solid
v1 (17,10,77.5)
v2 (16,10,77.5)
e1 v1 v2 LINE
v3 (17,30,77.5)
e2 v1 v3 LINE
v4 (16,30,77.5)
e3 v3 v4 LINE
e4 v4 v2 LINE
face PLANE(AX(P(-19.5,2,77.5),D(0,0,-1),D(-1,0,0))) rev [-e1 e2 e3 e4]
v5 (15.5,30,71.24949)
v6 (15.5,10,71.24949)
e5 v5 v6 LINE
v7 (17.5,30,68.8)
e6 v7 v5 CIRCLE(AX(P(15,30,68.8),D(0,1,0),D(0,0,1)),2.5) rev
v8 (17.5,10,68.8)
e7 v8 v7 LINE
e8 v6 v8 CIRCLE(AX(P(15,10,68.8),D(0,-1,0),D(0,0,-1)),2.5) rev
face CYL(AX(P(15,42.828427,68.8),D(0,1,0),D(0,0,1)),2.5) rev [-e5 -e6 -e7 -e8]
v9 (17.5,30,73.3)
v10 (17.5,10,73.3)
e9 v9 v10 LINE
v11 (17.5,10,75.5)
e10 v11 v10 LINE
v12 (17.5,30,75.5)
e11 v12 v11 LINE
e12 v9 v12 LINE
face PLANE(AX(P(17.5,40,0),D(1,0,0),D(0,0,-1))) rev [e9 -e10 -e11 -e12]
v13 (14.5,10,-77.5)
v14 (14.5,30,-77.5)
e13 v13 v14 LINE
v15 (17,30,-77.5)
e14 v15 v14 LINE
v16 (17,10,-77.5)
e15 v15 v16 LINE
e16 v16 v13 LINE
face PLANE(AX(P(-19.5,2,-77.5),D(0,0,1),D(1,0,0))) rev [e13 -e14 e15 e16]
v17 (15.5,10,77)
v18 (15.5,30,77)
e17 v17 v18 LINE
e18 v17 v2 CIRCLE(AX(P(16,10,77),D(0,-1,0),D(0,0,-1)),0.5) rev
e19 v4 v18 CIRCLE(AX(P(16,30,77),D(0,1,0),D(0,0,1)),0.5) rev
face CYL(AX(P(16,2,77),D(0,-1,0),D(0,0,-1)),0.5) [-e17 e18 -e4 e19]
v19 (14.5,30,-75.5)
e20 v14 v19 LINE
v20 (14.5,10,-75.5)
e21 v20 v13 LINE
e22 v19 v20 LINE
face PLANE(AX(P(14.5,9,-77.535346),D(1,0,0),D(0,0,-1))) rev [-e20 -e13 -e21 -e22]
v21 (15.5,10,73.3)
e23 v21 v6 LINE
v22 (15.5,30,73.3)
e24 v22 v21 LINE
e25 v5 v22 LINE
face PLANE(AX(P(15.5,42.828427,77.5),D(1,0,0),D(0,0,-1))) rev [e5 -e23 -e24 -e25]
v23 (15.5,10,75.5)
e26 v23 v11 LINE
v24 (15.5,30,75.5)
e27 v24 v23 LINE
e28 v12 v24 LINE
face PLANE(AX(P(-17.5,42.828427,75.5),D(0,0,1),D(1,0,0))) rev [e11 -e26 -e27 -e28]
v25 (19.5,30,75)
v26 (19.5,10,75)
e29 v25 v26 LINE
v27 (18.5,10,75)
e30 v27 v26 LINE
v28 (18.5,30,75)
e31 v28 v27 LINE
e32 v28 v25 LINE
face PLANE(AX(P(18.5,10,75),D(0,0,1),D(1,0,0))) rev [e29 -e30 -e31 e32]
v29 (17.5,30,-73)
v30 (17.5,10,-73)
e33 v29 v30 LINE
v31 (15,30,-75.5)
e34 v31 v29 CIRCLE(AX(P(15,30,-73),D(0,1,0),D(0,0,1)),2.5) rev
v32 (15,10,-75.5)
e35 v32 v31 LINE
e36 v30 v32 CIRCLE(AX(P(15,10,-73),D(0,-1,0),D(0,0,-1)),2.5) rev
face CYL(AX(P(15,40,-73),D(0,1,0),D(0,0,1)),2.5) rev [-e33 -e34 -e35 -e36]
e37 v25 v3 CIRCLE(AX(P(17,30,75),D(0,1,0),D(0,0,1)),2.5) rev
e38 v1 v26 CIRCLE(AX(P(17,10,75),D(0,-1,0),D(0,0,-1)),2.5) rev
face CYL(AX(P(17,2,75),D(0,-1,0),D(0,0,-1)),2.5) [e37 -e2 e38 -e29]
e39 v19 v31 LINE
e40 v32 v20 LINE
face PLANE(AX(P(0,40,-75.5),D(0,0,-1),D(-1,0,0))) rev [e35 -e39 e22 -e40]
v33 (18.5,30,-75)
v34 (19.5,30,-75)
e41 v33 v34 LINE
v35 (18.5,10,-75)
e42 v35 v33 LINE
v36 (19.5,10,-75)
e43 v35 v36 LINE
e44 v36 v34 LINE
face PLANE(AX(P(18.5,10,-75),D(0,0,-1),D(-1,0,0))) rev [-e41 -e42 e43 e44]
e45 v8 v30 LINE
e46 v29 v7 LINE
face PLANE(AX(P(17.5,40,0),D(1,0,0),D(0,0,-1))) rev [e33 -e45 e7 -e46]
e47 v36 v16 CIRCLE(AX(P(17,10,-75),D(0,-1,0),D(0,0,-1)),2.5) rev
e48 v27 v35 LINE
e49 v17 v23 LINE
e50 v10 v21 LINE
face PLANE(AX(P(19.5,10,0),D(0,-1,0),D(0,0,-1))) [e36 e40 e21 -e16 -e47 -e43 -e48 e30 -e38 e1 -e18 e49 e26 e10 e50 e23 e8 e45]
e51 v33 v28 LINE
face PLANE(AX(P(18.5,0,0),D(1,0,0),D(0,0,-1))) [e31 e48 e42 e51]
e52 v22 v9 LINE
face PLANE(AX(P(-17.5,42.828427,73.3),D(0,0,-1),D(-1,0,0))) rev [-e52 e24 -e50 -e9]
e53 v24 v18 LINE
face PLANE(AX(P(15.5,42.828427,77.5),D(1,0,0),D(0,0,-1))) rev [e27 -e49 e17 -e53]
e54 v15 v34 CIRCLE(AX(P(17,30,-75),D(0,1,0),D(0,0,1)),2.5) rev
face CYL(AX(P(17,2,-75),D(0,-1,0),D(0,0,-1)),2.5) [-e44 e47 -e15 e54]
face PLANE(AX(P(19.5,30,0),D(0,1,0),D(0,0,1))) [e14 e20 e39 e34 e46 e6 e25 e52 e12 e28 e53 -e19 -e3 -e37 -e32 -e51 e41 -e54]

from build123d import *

# Parameters (mm, degrees)
SKETCH1_W                       = 39
SKETCH1_H                       = 155
BOSS_EXTRUDE1_DEPTH             = 2
BOSS_EXTRUDE2_DEPTH             = 38
SKETCH3_W                       = 2
SKETCH3_H                       = 2
BOSS_EXTRUDE3_DEPTH             = 38
SKETCH4_W                       = 2
SKETCH4_H                       = 2
BOSS_EXTRUDE4_DEPTH             = 151
SKETCH6_W                       = 35
SKETCH6_H                       = 2.2
CUT_EXTRUDE1_DEPTH              = 160.340045186
SKETCH7_W                       = 35
SKETCH7_H                       = 2.2
CUT_EXTRUDE2_DEPTH              = 89.490112442
SKETCH5_W                       = 31
SKETCH5_H                       = 2
BOSS_EXTRUDE5_DEPTH             = 2
BOSS_EXTRUDE6_REACH             = 91.367
SKETCH8_W                       = 2
SKETCH8_H                       = 2
BOSS_EXTRUDE6_DIRECTION_2_REACH = 91.367
SKETCH10_W                      = 2
SKETCH10_H                      = 2.2
SKETCH10_W_2                    = 2.2
SKETCH10_H_2                    = 2
BOSS_EXTRUDE8_DEPTH             = 2
SKETCH11_W                      = 2
SKETCH11_H                      = 2.2
SKETCH11_W_2                    = 2.2
SKETCH11_H_2                    = 2
BOSS_EXTRUDE9_DEPTH             = 2
FILLET2_R                       = 2.5
SKETCH14_W                      = 36.5
SKETCH14_H                      = 7.75
BOSS_EXTRUDE10_DEPTH            = 2
SKETCH13_W                      = 31
SKETCH13_H                      = 3
CUT_EXTRUDE4_DEPTH              = 2
FILLET3_R                       = 2
FILLET4_R                       = 0.5
SKETCH15_R                      = 5.1
CUT_EXTRUDE5_DEPTH              = 90.367219941
SKETCH16_R                      = 7.1
BOSS_EXTRUDE11_DEPTH            = 1
FILLET5_R                       = 0.5
CUT_EXTRUDE3_DEPTH              = 160.340045186
FILLET6_R                       = 0.4
FILLET7_R                       = 0.5
CUT_EXTRUDE6_DEPTH              = 6
SKETCH18_W                      = 29
SKETCH18_H                      = 3
CUT_EXTRUDE8_DEPTH              = 90.367220028
CUT_EXTRUDE11_DEPTH             = 90.367220028
CUT_EXTRUDE11_DEPTH_BACK        = 90.367220028
SKETCH20_W                      = 29
SKETCH20_H                      = 34
SKETCH21_W                      = 155
SKETCH21_H                      = 10
CUT_EXTRUDE12_DEPTH             = 90.367219941
SKETCH22_W                      = 150
SKETCH22_H                      = 20
CUT_EXTRUDE13_DEPTH             = 1


with BuildPart() as part:
    # Sketch1 → Boss-Extrude1 (new body)
    with BuildSketch(Plane(origin=(0, 0, 0), x_dir=(1, 0, 0), z_dir=(0, 1, 0))):
        Rectangle(SKETCH1_W, SKETCH1_H)
    extrude(amount=BOSS_EXTRUDE1_DEPTH)

    # Sketch2 → Boss-Extrude2 (add)
    with BuildSketch(Plane(origin=(0, 2, 0), x_dir=(1, 0, 0), z_dir=(0, 1, 0))):
        Polygon((-17.5, -77.5), (-17.5, -75.5), (-17.5, 75.5), (17.5, 75.5), (17.5, -75.5), (17.5, -77.5), (19.5, -77.5), (19.5, 77.5), (-19.5, 77.5), (-19.5, -77.5), align=None)
    extrude(amount=BOSS_EXTRUDE2_DEPTH)

    # Sketch3 → Boss-Extrude3 (add)
    with BuildSketch(Plane(origin=(0, 2, 0), x_dir=(1, 0, 0), z_dir=(0, 1, 0))):
        with Locations((-16.5, -76.5)):
            Rectangle(SKETCH3_W, SKETCH3_H)
        with Locations((-16.5, -72.3)):
            Rectangle(SKETCH3_W, SKETCH3_H)
        with Locations((16.5, -76.5)):
            Rectangle(SKETCH3_W, SKETCH3_H)
        with Locations((16.5, -72.3)):
            Rectangle(SKETCH3_W, SKETCH3_H)
    extrude(amount=BOSS_EXTRUDE3_DEPTH)

    # Sketch4 → Boss-Extrude4 (add)
    with BuildSketch(Plane.XY.offset(-75.5)):
        with Locations((-16.5, 39)):
            Rectangle(SKETCH4_W, SKETCH4_H)
        Polygon((-15.5, 33.8), (-17.5, 31.8), (-17.5, 35.8), (-15.5, 35.8), align=None)
        Polygon((15.5, 35.8), (17.5, 35.8), (17.5, 31.8), (15.5, 33.8), align=None)
        with Locations((16.5, 39)):
            Rectangle(SKETCH4_W, SKETCH4_H)
    extrude(amount=BOSS_EXTRUDE4_DEPTH)

    # Sketch6 → Cut-Extrude1 (cut, through all)
    with BuildSketch(Plane.XY.offset(-75.5)):
        with Locations((0, 36.9)):
            Rectangle(SKETCH6_W, SKETCH6_H)
    extrude(amount=CUT_EXTRUDE1_DEPTH, mode=Mode.SUBTRACT)

    # Sketch7 → Cut-Extrude2 (cut, through all)
    with BuildSketch(Plane(origin=(0, 2, 0), x_dir=(1, 0, 0), z_dir=(0, 1, 0))):
        with Locations((0, -74.4)):
            Rectangle(SKETCH7_W, SKETCH7_H)
    extrude(amount=CUT_EXTRUDE2_DEPTH, mode=Mode.SUBTRACT)

    # Sketch5 → Boss-Extrude5 (add)
    with BuildSketch(Plane(origin=(0, 2, 0), x_dir=(1, 0, 0), z_dir=(0, 1, 0))):
        with Locations((0, -76.5)):
            Rectangle(SKETCH5_W, SKETCH5_H)
        with Locations((0, -72.3)):
            Rectangle(SKETCH5_W, SKETCH5_H)
    extrude(amount=BOSS_EXTRUDE5_DEPTH)

    # Boss-Extrude6: up to this face of the body (flat: up to its plane)
    boss_extrude6_end = Plane(part.part.faces().sort_by_distance((17.5, 16.9, -2.1))[0])
    # Sketch8 → Boss-Extrude6 (add, up to the picked face)
    with BuildSketch(Plane(origin=(0, 0, 0), x_dir=(0, 0, -1), z_dir=(1, 0, 0)), mode=Mode.PRIVATE) as boss_extrude6_sk1:
        with Locations((74.5, 39)):
            Rectangle(SKETCH8_W, SKETCH8_H)
    boss_extrude6_tool1 = split(extrude(boss_extrude6_sk1.sketch, amount=BOSS_EXTRUDE6_REACH, mode=Mode.PRIVATE), bisect_by=boss_extrude6_end, keep=Keep.BOTH, mode=Mode.PRIVATE)
    # Sketch8 → Boss-Extrude6 (add, up to the picked face)
    with BuildSketch(Plane(origin=(0, 0, 0), x_dir=(0, 0, -1), z_dir=(1, 0, 0)), mode=Mode.PRIVATE) as boss_extrude6_sk2:
        Polygon((75.5, 35.8), (73.5, 35.8), (73.5, 33.8), (75.5, 31.8), align=None)
    boss_extrude6_tool2 = split(extrude(boss_extrude6_sk2.sketch, amount=BOSS_EXTRUDE6_REACH, mode=Mode.PRIVATE), bisect_by=boss_extrude6_end, keep=Keep.BOTH, mode=Mode.PRIVATE)
    add(boss_extrude6_tool1.solids().sort_by(Axis((0, 39, -74.5), (1, 0, 0)))[0])
    add(boss_extrude6_tool2.solids().sort_by(Axis((0, 34.244444, -74.611111), (1, 0, 0)))[0])

    # Boss-Extrude6 direction 2: up to this face of the body (flat: up to its plane)
    boss_extrude6_direction_2_end = Plane(part.part.faces().sort_by_distance((-17.5, 16.9, -2.1))[0])
    # Sketch8 → Boss-Extrude6 direction 2 (add, up to the picked face)
    with BuildSketch(Plane(origin=(0, 0, 0), x_dir=(0, 0, -1), z_dir=(1, 0, 0)), mode=Mode.PRIVATE) as boss_extrude6_direction_2_sk1:
        with Locations((74.5, 39)):
            Rectangle(SKETCH8_W, SKETCH8_H)
    boss_extrude6_direction_2_tool1 = split(extrude(boss_extrude6_direction_2_sk1.sketch, amount=-BOSS_EXTRUDE6_DIRECTION_2_REACH, mode=Mode.PRIVATE), bisect_by=boss_extrude6_direction_2_end, keep=Keep.BOTH, mode=Mode.PRIVATE)
    # Sketch8 → Boss-Extrude6 direction 2 (add, up to the picked face)
    with BuildSketch(Plane(origin=(0, 0, 0), x_dir=(0, 0, -1), z_dir=(1, 0, 0)), mode=Mode.PRIVATE) as boss_extrude6_direction_2_sk2:
        Polygon((75.5, 35.8), (73.5, 35.8), (73.5, 33.8), (75.5, 31.8), align=None)
    boss_extrude6_direction_2_tool2 = split(extrude(boss_extrude6_direction_2_sk2.sketch, amount=-BOSS_EXTRUDE6_DIRECTION_2_REACH, mode=Mode.PRIVATE), bisect_by=boss_extrude6_direction_2_end, keep=Keep.BOTH, mode=Mode.PRIVATE)
    add(boss_extrude6_direction_2_tool1.solids().sort_by(Axis((0, 39, -74.5), (-1, 0, 0)))[0])
    add(boss_extrude6_direction_2_tool2.solids().sort_by(Axis((0, 34.244444, -74.611111), (-1, 0, 0)))[0])

    # Sketch10 → Boss-Extrude8 (add)
    with BuildSketch(Plane(origin=(-17.5, 0, 0), x_dir=(0, 0, -1), z_dir=(1, 0, 0))):
        with Locations((-76.5, 36.9)):
            Rectangle(SKETCH10_W, SKETCH10_H)
        with Locations((-74.4, 39)):
            Rectangle(SKETCH10_W_2, SKETCH10_H_2)
    extrude(amount=BOSS_EXTRUDE8_DEPTH)

    # Sketch11 → Boss-Extrude9 (add)
    with BuildSketch(Plane.ZY.offset(-17.5)):
        with Locations((76.5, 36.9)):
            Rectangle(SKETCH11_W, SKETCH11_H)
        with Locations((74.4, 39)):
            Rectangle(SKETCH11_W_2, SKETCH11_H_2)
    extrude(amount=BOSS_EXTRUDE9_DEPTH)

    # Fillet2
    fillet2_edges = [part.edges().sort_by_distance(p)[0] for p in [
        (-17.5, 16.9, 71.3),
        (17.5, 16.9, 71.3),
        (19.5, 20, 77.5),
        (-19.5, 20, 77.5),
        (-19.5, 20, -77.5),
        (-17.5, 16.9, -75.5),
        (17.5, 16.9, -75.5),
        (19.5, 20, -77.5),
        (19.5, 40, 0),
        (-19.5, 40, 0),
        (19.5, 0, 0),
        (-19.5, 0, 0),
        (0, 40, -77.5),
        (0, 0, 77.5),
        (0, 0, -77.5),
        (-17.5, 40, 77.5),
        (17.5, 40, 77.5),
    ]]
    fillet(fillet2_edges, radius=FILLET2_R)

    # Sketch14 → Boss-Extrude10 (add)
    with BuildSketch(Plane.XY.offset(-75.5)):
        with Locations((0, 5.125)):
            Rectangle(SKETCH14_W, SKETCH14_H)
    extrude(amount=BOSS_EXTRUDE10_DEPTH)

    # Sketch13 → Cut-Extrude4 (cut)
    with BuildSketch(Plane(origin=(0, 0, -77.5), x_dir=(-1, 0, 0), z_dir=(0, 0, -1))):
        with Locations((0, 5.5)):
            Rectangle(SKETCH13_W, SKETCH13_H)
    extrude(amount=-CUT_EXTRUDE4_DEPTH, mode=Mode.SUBTRACT)

    # Fillet3
    fillet3_edges = [part.edges().sort_by_distance(p)[0] for p in [
        (0, 9, -73.5),
    ]]
    fillet(fillet3_edges, radius=FILLET3_R - 0.0001)  # a hair under: the kernel refuses the full size

    # Fillet4
    fillet4_edges = [part.edges().sort_by_distance(p)[0] for p in [
        (15.5, 5.5, -75.5),
        (15.5, 4, -76.5),
        (0, 7, -75.5),
        (15.5, 7, -76.5),
        (-15.5, 5.5, -75.5),
        (-15.5, 7, -76.5),
        (0, 4, -75.5),
        (-15.5, 4, -76.5),
        (15.5, 5.5, -77.5),
        (0, 4, -77.5),
        (-15.5, 5.5, -77.5),
        (0, 7, -77.5),
    ]]
    fillet(fillet4_edges, radius=FILLET4_R)

    # Sketch15 → Cut-Extrude5 (cut, through all)
    with BuildSketch(Plane.XZ):
        with Locations(Location((0, 38.75, 0), (0, 0, 270))):
            Circle(SKETCH15_R)
        with Locations(Location((0, -38.75, 0), (0, 0, 270))):
            Circle(SKETCH15_R)
    extrude(amount=-CUT_EXTRUDE5_DEPTH, mode=Mode.SUBTRACT)

    # Sketch16 → Boss-Extrude11 (add)
    with BuildSketch(Plane(origin=(0, 2, 0), x_dir=(1, 0, 0), z_dir=(0, 1, 0))):
        with Locations(Location((0, 38.75, 0), (0, 0, 270))):
            Circle(SKETCH16_R)
        with Locations(Location((0, -38.75, 0), (0, 0, 270))):
            Circle(SKETCH16_R)
    extrude(amount=BOSS_EXTRUDE11_DEPTH)

    # Fillet5
    fillet5_edges = [part.edges().sort_by_distance(p)[0] for p in [
        (0, 2, -45.85),
        (0, 3, -45.85),
        (0, 2, 31.65),
        (0, 3, 31.65),
    ]]
    fillet(fillet5_edges, radius=FILLET5_R - 0.0001)  # a hair under: the kernel refuses the full size

    # Sketch12 → Cut-Extrude3 (cut, through all)
    with BuildSketch(Plane.XY.offset(-75.5)):
        with BuildLine():
            Line((1.668907005, 12.688040659), (2.22520934, 10.250720878))
            ThreePointArc((2.22520934, 10.250720878), (4.338837391, 10.990311321), (6.234898019, 12.181685175))
            Line((6.234898019, 12.181685175), (4.676173514, 14.136263881))
            ThreePointArc((4.676173514, 14.136263881), (3.254128043, 13.242733491), (1.668907005, 12.688040659))
        make_face()
        with BuildLine():
            ThreePointArc((-6.234898019, 12.181685175), (-4.338837391, 10.990311321), (-2.22520934, 10.250720878))
            Line((-2.22520934, 10.250720878), (-1.668907005, 12.688040659))
            ThreePointArc((-1.668907005, 12.688040659), (-3.254128043, 13.242733491), (-4.676173514, 14.136263881))
            Line((-4.676173514, 14.136263881), (-6.234898019, 12.181685175))
        make_face()
        with BuildLine():
            ThreePointArc((-10, 20), (-9.749279122, 17.77479066), (-9.009688679, 15.661162609))
            Line((-9.009688679, 15.661162609), (-6.757266509, 16.745871957))
            ThreePointArc((-6.757266509, 16.745871957), (-7.311959341, 18.331092995), (-7.5, 20))
            Line((-7.5, 20), (-10, 20))
        make_face()
        with BuildLine():
            ThreePointArc((-6.234898019, 27.818314825), (-7.818314825, 26.234898019), (-9.009688679, 24.338837391))
            Line((-9.009688679, 24.338837391), (-6.757266509, 23.254128043))
            ThreePointArc((-6.757266509, 23.254128043), (-5.863736119, 24.676173514), (-4.676173514, 25.863736119))
            Line((-4.676173514, 25.863736119), (-6.234898019, 27.818314825))
        make_face()
        with BuildLine():
            ThreePointArc((-1.668907005, 27.311959341), (-0.839733571, 27.452841574), (0, 27.5))
            Line((0, 27.5), (0, 30))
            ThreePointArc((0, 30), (-1.119644761, 29.937122099), (-2.22520934, 29.749279122))
            Line((-2.22520934, 29.749279122), (-1.668907005, 27.311959341))
        make_face()
        with BuildLine():
            Line((0, 30), (0, 27.5))
            ThreePointArc((0, 27.5), (0.839733571, 27.452841574), (1.668907005, 27.311959341))
            Line((1.668907005, 27.311959341), (2.22520934, 29.749279122))
            ThreePointArc((2.22520934, 29.749279122), (1.119644761, 29.937122099), (0, 30))
        make_face()
        with BuildLine():
            Line((6.757266509, 23.254128043), (9.009688679, 24.338837391))
            ThreePointArc((9.009688679, 24.338837391), (7.818314825, 26.234898019), (6.234898019, 27.818314825))
            Line((6.234898019, 27.818314825), (4.676173514, 25.863736119))
            ThreePointArc((4.676173514, 25.863736119), (5.863736119, 24.676173514), (6.757266509, 23.254128043))
        make_face()
        with BuildLine():
            Line((6.757266509, 16.745871957), (9.009688679, 15.661162609))
            ThreePointArc((9.009688679, 15.661162609), (9.749279122, 17.77479066), (10, 20))
            Line((10, 20), (7.5, 20))
            ThreePointArc((7.5, 20), (7.311959341, 18.331092995), (6.757266509, 16.745871957))
        make_face()
        with BuildLine():
            ThreePointArc((2.5, 20), (2.43731978, 19.443697665), (2.25242217, 18.915290652))
            Line((2.25242217, 18.915290652), (4.50484434, 17.830581304))
            ThreePointArc((4.50484434, 17.830581304), (4.874639561, 18.88739533), (5, 20))
            Line((5, 20), (2.5, 20))
        make_face()
        with BuildLine():
            ThreePointArc((1.558724505, 21.954578706), (1.954578706, 21.558724505), (2.25242217, 21.084709348))
            Line((2.25242217, 21.084709348), (4.50484434, 22.169418696))
            ThreePointArc((4.50484434, 22.169418696), (3.909157412, 23.117449009), (3.117449009, 23.909157412))
            Line((3.117449009, 23.909157412), (1.558724505, 21.954578706))
        make_face()
        with BuildLine():
            Line((0, 25), (0, 22.5))
            ThreePointArc((0, 22.5), (0.27991119, 22.484280525), (0.556302335, 22.43731978))
            Line((0.556302335, 22.43731978), (1.11260467, 24.874639561))
            ThreePointArc((1.11260467, 24.874639561), (0.559822381, 24.968561049), (0, 25))
        make_face()
        with BuildLine():
            ThreePointArc((-0.556302335, 22.43731978), (-0.27991119, 22.484280525), (0, 22.5))
            Line((0, 22.5), (0, 25))
            ThreePointArc((0, 25), (-0.559822381, 24.968561049), (-1.11260467, 24.874639561))
            Line((-1.11260467, 24.874639561), (-0.556302335, 22.43731978))
        make_face()
        with BuildLine():
            ThreePointArc((-2.25242217, 21.084709348), (-1.954578706, 21.558724505), (-1.558724505, 21.954578706))
            Line((-1.558724505, 21.954578706), (-3.117449009, 23.909157412))
            ThreePointArc((-3.117449009, 23.909157412), (-3.909157412, 23.117449009), (-4.50484434, 22.169418696))
            Line((-4.50484434, 22.169418696), (-2.25242217, 21.084709348))
        make_face()
        with BuildLine():
            ThreePointArc((-2.25242217, 18.915290652), (-2.43731978, 19.443697665), (-2.5, 20))
            Line((-2.5, 20), (-5, 20))
            ThreePointArc((-5, 20), (-4.874639561, 18.88739533), (-4.50484434, 17.830581304))
            Line((-4.50484434, 17.830581304), (-2.25242217, 18.915290652))
        make_face()
        with BuildLine():
            ThreePointArc((-3.117449009, 16.090842588), (-2.169418696, 15.49515566), (-1.11260467, 15.125360439))
            Line((-1.11260467, 15.125360439), (-0.556302335, 17.56268022))
            ThreePointArc((-0.556302335, 17.56268022), (-1.084709348, 17.74757783), (-1.558724505, 18.045421294))
            Line((-1.558724505, 18.045421294), (-3.117449009, 16.090842588))
        make_face()
        with BuildLine():
            Line((0.556302335, 17.56268022), (1.11260467, 15.125360439))
            ThreePointArc((1.11260467, 15.125360439), (2.169418696, 15.49515566), (3.117449009, 16.090842588))
            Line((3.117449009, 16.090842588), (1.558724505, 18.045421294))
            ThreePointArc((1.558724505, 18.045421294), (1.084709348, 17.74757783), (0.556302335, 17.56268022))
        make_face()
    extrude(amount=-CUT_EXTRUDE3_DEPTH, mode=Mode.SUBTRACT)

    # Fillet6
    fillet6_edges = [part.edges().sort_by_distance(p)[0] for p in [
        (5.863736119, 24.676173514, -75.5),
        (5.455535766, 26.841025472, -75.5),
        (7.818314825, 26.234898019, -77.5),
        (7.883477594, 23.796482717, -77.5),
        (5.863736119, 24.676173514, -77.5),
        (5.455535766, 26.841025472, -77.5),
        (7.883477594, 23.796482717, -75.5),
        (7.818314825, 26.234898019, -75.5),
        (7.311959341, 18.331092995, -75.5),
        (8.75, 20, -75.5),
        (9.749279122, 17.77479066, -77.5),
        (7.883477594, 16.203517283, -77.5),
        (7.311959341, 18.331092995, -77.5),
        (8.75, 20, -77.5),
        (7.883477594, 16.203517283, -75.5),
        (9.749279122, 17.77479066, -75.5),
        (2.43731978, 19.443697665, -75.5),
        (3.75, 20, -75.5),
        (4.874639561, 18.88739533, -77.5),
        (3.378633255, 18.372935978, -77.5),
        (2.43731978, 19.443697665, -77.5),
        (3.75, 20, -77.5),
        (3.378633255, 18.372935978, -75.5),
        (4.874639561, 18.88739533, -75.5),
        (1.954578706, 21.558724505, -75.5),
        (2.338086757, 22.931868059, -75.5),
        (3.909157412, 23.117449009, -77.5),
        (3.378633255, 21.627064022, -77.5),
        (1.954578706, 21.558724505, -77.5),
        (2.338086757, 22.931868059, -77.5),
        (3.378633255, 21.627064022, -75.5),
        (3.909157412, 23.117449009, -75.5),
        (0, 27.5, -75.5),
        (-1.947058172, 28.530619232, -75.5),
        (0, 30, -77.5),
        (1.947058172, 28.530619232, -77.5),
        (0, 27.5, -77.5),
        (-1.947058172, 28.530619232, -77.5),
        (1.947058172, 28.530619232, -75.5),
        (0, 30, -75.5),
        (-5.863736119, 24.676173514, -75.5),
        (-7.883477594, 23.796482717, -75.5),
        (-7.818314825, 26.234898019, -77.5),
        (-5.455535766, 26.841025472, -77.5),
        (-5.863736119, 24.676173514, -77.5),
        (-7.883477594, 23.796482717, -77.5),
        (-5.455535766, 26.841025472, -75.5),
        (-7.818314825, 26.234898019, -75.5),
        (-7.311959341, 18.331092995, -75.5),
        (-7.883477594, 16.203517283, -75.5),
        (-9.749279122, 17.77479066, -77.5),
        (-8.75, 20, -77.5),
        (-7.311959341, 18.331092995, -77.5),
        (-7.883477594, 16.203517283, -77.5),
        (-8.75, 20, -75.5),
        (-9.749279122, 17.77479066, -75.5),
        (-3.254128043, 13.242733491, -75.5),
        (-1.947058172, 11.469380768, -75.5),
        (-4.338837391, 10.990311321, -77.5),
        (-5.455535766, 13.158974528, -77.5),
        (-3.254128043, 13.242733491, -77.5),
        (-1.947058172, 11.469380768, -77.5),
        (-5.455535766, 13.158974528, -75.5),
        (-4.338837391, 10.990311321, -75.5),
        (1.084709348, 17.74757783, -75.5),
        (2.338086757, 17.068131941, -75.5),
        (2.169418696, 15.49515566, -77.5),
        (0.834453502, 16.344020329, -77.5),
        (1.084709348, 17.74757783, -77.5),
        (2.338086757, 17.068131941, -77.5),
        (0.834453502, 16.344020329, -75.5),
        (2.169418696, 15.49515566, -75.5),
        (-2.43731978, 19.443697665, -75.5),
        (-3.378633255, 18.372935978, -75.5),
        (-4.874639561, 18.88739533, -77.5),
        (-3.75, 20, -77.5),
        (-2.43731978, 19.443697665, -77.5),
        (-3.378633255, 18.372935978, -77.5),
        (-3.75, 20, -75.5),
        (-4.874639561, 18.88739533, -75.5),
        (-1.084709348, 17.74757783, -75.5),
        (-0.834453502, 16.344020329, -75.5),
        (-2.169418696, 15.49515566, -77.5),
        (-2.338086757, 17.068131941, -77.5),
        (-1.084709348, 17.74757783, -77.5),
        (-0.834453502, 16.344020329, -77.5),
        (-2.338086757, 17.068131941, -75.5),
        (-2.169418696, 15.49515566, -75.5),
        (-1.954578706, 21.558724505, -75.5),
        (-3.378633255, 21.627064022, -75.5),
        (-3.909157412, 23.117449009, -77.5),
        (-2.338086757, 22.931868059, -77.5),
        (-1.954578706, 21.558724505, -77.5),
        (-3.378633255, 21.627064022, -77.5),
        (-2.338086757, 22.931868059, -75.5),
        (-3.909157412, 23.117449009, -75.5),
        (0, 25, -77.5),
        (0.834453502, 23.655979671, -77.5),
        (0, 22.5, -75.5),
        (-0.834453502, 23.655979671, -75.5),
        (0, 22.5, -77.5),
        (-0.834453502, 23.655979671, -77.5),
        (0, 25, -75.5),
        (0.834453502, 23.655979671, -75.5),
        (3.254128043, 13.242733491, -75.5),
        (5.455535766, 13.158974528, -75.5),
        (4.338837391, 10.990311321, -77.5),
        (1.947058172, 11.469380768, -77.5),
        (3.254128043, 13.242733491, -77.5),
        (5.455535766, 13.158974528, -77.5),
        (1.947058172, 11.469380768, -75.5),
        (4.338837391, 10.990311321, -75.5),
    ]]
    fillet(fillet6_edges, radius=FILLET6_R)

    # Fillet7
    fillet7_edges = [part.edges().sort_by_distance(p)[0] for p in [
        (15.5, 40, 0.75),
        (0, 4, 77.5),
        (0, 40, -73.5),
        (-15.5, 40, 0.75),
        (-15.5, 20.75, 77.5),
        (-15.5, 39.267766953, 76.767766953),
        (15.5, 20.75, 77.5),
        (15.5, 39.267766953, 76.767766953),
    ]]
    fillet(fillet7_edges, radius=FILLET7_R)

    # Sketch17 → Cut-Extrude6 (cut)
    with BuildSketch(Plane.XZ):
        Polygon((-17, -77.5), (-17, 70.299999999), (-14.999999999, 71.3), (-14.999999999, 77.5), (14.999999999, 77.5), (14.999999999, 71.3), (17, 70.299999999), (17, -77.5), align=None)
    extrude(amount=-CUT_EXTRUDE6_DEPTH, mode=Mode.SUBTRACT)

    # Sketch18 → Cut-Extrude8 (cut, through all)
    with BuildSketch(Plane.XY):
        with Locations((0, 7.5)):
            Rectangle(SKETCH18_W, SKETCH18_H)
    extrude(amount=-CUT_EXTRUDE8_DEPTH, mode=Mode.SUBTRACT)

    # Sketch20 → Cut-Extrude11 (cut, two sides: drawn at the far end of the back side and taken through both)
    with BuildSketch(Plane.XY.offset(-CUT_EXTRUDE11_DEPTH_BACK)):
        with Locations((0, 23)):
            Rectangle(SKETCH20_W, SKETCH20_H)
    extrude(amount=CUT_EXTRUDE11_DEPTH + CUT_EXTRUDE11_DEPTH_BACK, mode=Mode.SUBTRACT)


with BuildPart() as body_2:
    # of the pieces the cut leaves, the one that is kept (cut_extrude11_keep)
    add(part.part.solids().sort_by_distance((14.5, 40, -75))[0])

    # Sketch21 → Cut-Extrude12 (cut, through all)
    with BuildSketch(Plane(origin=(0, 0, 0), x_dir=(0, 0, -1), z_dir=(1, 0, 0))):
        with Locations((0, 35)):
            Rectangle(SKETCH21_W, SKETCH21_H)
        with Locations((0, 5)):
            Rectangle(SKETCH21_W, SKETCH21_H)
    extrude(amount=CUT_EXTRUDE12_DEPTH, mode=Mode.SUBTRACT)

    # Sketch22 → Cut-Extrude13 (cut)
    with BuildSketch(Plane(origin=(19.5, 0, 0), x_dir=(0, 0, -1), z_dir=(1, 0, 0))):
        with Locations((0, 20)):
            Rectangle(SKETCH22_W, SKETCH22_H)
    extrude(amount=-CUT_EXTRUDE13_DEPTH, mode=Mode.SUBTRACT)


solid = body_2.part
